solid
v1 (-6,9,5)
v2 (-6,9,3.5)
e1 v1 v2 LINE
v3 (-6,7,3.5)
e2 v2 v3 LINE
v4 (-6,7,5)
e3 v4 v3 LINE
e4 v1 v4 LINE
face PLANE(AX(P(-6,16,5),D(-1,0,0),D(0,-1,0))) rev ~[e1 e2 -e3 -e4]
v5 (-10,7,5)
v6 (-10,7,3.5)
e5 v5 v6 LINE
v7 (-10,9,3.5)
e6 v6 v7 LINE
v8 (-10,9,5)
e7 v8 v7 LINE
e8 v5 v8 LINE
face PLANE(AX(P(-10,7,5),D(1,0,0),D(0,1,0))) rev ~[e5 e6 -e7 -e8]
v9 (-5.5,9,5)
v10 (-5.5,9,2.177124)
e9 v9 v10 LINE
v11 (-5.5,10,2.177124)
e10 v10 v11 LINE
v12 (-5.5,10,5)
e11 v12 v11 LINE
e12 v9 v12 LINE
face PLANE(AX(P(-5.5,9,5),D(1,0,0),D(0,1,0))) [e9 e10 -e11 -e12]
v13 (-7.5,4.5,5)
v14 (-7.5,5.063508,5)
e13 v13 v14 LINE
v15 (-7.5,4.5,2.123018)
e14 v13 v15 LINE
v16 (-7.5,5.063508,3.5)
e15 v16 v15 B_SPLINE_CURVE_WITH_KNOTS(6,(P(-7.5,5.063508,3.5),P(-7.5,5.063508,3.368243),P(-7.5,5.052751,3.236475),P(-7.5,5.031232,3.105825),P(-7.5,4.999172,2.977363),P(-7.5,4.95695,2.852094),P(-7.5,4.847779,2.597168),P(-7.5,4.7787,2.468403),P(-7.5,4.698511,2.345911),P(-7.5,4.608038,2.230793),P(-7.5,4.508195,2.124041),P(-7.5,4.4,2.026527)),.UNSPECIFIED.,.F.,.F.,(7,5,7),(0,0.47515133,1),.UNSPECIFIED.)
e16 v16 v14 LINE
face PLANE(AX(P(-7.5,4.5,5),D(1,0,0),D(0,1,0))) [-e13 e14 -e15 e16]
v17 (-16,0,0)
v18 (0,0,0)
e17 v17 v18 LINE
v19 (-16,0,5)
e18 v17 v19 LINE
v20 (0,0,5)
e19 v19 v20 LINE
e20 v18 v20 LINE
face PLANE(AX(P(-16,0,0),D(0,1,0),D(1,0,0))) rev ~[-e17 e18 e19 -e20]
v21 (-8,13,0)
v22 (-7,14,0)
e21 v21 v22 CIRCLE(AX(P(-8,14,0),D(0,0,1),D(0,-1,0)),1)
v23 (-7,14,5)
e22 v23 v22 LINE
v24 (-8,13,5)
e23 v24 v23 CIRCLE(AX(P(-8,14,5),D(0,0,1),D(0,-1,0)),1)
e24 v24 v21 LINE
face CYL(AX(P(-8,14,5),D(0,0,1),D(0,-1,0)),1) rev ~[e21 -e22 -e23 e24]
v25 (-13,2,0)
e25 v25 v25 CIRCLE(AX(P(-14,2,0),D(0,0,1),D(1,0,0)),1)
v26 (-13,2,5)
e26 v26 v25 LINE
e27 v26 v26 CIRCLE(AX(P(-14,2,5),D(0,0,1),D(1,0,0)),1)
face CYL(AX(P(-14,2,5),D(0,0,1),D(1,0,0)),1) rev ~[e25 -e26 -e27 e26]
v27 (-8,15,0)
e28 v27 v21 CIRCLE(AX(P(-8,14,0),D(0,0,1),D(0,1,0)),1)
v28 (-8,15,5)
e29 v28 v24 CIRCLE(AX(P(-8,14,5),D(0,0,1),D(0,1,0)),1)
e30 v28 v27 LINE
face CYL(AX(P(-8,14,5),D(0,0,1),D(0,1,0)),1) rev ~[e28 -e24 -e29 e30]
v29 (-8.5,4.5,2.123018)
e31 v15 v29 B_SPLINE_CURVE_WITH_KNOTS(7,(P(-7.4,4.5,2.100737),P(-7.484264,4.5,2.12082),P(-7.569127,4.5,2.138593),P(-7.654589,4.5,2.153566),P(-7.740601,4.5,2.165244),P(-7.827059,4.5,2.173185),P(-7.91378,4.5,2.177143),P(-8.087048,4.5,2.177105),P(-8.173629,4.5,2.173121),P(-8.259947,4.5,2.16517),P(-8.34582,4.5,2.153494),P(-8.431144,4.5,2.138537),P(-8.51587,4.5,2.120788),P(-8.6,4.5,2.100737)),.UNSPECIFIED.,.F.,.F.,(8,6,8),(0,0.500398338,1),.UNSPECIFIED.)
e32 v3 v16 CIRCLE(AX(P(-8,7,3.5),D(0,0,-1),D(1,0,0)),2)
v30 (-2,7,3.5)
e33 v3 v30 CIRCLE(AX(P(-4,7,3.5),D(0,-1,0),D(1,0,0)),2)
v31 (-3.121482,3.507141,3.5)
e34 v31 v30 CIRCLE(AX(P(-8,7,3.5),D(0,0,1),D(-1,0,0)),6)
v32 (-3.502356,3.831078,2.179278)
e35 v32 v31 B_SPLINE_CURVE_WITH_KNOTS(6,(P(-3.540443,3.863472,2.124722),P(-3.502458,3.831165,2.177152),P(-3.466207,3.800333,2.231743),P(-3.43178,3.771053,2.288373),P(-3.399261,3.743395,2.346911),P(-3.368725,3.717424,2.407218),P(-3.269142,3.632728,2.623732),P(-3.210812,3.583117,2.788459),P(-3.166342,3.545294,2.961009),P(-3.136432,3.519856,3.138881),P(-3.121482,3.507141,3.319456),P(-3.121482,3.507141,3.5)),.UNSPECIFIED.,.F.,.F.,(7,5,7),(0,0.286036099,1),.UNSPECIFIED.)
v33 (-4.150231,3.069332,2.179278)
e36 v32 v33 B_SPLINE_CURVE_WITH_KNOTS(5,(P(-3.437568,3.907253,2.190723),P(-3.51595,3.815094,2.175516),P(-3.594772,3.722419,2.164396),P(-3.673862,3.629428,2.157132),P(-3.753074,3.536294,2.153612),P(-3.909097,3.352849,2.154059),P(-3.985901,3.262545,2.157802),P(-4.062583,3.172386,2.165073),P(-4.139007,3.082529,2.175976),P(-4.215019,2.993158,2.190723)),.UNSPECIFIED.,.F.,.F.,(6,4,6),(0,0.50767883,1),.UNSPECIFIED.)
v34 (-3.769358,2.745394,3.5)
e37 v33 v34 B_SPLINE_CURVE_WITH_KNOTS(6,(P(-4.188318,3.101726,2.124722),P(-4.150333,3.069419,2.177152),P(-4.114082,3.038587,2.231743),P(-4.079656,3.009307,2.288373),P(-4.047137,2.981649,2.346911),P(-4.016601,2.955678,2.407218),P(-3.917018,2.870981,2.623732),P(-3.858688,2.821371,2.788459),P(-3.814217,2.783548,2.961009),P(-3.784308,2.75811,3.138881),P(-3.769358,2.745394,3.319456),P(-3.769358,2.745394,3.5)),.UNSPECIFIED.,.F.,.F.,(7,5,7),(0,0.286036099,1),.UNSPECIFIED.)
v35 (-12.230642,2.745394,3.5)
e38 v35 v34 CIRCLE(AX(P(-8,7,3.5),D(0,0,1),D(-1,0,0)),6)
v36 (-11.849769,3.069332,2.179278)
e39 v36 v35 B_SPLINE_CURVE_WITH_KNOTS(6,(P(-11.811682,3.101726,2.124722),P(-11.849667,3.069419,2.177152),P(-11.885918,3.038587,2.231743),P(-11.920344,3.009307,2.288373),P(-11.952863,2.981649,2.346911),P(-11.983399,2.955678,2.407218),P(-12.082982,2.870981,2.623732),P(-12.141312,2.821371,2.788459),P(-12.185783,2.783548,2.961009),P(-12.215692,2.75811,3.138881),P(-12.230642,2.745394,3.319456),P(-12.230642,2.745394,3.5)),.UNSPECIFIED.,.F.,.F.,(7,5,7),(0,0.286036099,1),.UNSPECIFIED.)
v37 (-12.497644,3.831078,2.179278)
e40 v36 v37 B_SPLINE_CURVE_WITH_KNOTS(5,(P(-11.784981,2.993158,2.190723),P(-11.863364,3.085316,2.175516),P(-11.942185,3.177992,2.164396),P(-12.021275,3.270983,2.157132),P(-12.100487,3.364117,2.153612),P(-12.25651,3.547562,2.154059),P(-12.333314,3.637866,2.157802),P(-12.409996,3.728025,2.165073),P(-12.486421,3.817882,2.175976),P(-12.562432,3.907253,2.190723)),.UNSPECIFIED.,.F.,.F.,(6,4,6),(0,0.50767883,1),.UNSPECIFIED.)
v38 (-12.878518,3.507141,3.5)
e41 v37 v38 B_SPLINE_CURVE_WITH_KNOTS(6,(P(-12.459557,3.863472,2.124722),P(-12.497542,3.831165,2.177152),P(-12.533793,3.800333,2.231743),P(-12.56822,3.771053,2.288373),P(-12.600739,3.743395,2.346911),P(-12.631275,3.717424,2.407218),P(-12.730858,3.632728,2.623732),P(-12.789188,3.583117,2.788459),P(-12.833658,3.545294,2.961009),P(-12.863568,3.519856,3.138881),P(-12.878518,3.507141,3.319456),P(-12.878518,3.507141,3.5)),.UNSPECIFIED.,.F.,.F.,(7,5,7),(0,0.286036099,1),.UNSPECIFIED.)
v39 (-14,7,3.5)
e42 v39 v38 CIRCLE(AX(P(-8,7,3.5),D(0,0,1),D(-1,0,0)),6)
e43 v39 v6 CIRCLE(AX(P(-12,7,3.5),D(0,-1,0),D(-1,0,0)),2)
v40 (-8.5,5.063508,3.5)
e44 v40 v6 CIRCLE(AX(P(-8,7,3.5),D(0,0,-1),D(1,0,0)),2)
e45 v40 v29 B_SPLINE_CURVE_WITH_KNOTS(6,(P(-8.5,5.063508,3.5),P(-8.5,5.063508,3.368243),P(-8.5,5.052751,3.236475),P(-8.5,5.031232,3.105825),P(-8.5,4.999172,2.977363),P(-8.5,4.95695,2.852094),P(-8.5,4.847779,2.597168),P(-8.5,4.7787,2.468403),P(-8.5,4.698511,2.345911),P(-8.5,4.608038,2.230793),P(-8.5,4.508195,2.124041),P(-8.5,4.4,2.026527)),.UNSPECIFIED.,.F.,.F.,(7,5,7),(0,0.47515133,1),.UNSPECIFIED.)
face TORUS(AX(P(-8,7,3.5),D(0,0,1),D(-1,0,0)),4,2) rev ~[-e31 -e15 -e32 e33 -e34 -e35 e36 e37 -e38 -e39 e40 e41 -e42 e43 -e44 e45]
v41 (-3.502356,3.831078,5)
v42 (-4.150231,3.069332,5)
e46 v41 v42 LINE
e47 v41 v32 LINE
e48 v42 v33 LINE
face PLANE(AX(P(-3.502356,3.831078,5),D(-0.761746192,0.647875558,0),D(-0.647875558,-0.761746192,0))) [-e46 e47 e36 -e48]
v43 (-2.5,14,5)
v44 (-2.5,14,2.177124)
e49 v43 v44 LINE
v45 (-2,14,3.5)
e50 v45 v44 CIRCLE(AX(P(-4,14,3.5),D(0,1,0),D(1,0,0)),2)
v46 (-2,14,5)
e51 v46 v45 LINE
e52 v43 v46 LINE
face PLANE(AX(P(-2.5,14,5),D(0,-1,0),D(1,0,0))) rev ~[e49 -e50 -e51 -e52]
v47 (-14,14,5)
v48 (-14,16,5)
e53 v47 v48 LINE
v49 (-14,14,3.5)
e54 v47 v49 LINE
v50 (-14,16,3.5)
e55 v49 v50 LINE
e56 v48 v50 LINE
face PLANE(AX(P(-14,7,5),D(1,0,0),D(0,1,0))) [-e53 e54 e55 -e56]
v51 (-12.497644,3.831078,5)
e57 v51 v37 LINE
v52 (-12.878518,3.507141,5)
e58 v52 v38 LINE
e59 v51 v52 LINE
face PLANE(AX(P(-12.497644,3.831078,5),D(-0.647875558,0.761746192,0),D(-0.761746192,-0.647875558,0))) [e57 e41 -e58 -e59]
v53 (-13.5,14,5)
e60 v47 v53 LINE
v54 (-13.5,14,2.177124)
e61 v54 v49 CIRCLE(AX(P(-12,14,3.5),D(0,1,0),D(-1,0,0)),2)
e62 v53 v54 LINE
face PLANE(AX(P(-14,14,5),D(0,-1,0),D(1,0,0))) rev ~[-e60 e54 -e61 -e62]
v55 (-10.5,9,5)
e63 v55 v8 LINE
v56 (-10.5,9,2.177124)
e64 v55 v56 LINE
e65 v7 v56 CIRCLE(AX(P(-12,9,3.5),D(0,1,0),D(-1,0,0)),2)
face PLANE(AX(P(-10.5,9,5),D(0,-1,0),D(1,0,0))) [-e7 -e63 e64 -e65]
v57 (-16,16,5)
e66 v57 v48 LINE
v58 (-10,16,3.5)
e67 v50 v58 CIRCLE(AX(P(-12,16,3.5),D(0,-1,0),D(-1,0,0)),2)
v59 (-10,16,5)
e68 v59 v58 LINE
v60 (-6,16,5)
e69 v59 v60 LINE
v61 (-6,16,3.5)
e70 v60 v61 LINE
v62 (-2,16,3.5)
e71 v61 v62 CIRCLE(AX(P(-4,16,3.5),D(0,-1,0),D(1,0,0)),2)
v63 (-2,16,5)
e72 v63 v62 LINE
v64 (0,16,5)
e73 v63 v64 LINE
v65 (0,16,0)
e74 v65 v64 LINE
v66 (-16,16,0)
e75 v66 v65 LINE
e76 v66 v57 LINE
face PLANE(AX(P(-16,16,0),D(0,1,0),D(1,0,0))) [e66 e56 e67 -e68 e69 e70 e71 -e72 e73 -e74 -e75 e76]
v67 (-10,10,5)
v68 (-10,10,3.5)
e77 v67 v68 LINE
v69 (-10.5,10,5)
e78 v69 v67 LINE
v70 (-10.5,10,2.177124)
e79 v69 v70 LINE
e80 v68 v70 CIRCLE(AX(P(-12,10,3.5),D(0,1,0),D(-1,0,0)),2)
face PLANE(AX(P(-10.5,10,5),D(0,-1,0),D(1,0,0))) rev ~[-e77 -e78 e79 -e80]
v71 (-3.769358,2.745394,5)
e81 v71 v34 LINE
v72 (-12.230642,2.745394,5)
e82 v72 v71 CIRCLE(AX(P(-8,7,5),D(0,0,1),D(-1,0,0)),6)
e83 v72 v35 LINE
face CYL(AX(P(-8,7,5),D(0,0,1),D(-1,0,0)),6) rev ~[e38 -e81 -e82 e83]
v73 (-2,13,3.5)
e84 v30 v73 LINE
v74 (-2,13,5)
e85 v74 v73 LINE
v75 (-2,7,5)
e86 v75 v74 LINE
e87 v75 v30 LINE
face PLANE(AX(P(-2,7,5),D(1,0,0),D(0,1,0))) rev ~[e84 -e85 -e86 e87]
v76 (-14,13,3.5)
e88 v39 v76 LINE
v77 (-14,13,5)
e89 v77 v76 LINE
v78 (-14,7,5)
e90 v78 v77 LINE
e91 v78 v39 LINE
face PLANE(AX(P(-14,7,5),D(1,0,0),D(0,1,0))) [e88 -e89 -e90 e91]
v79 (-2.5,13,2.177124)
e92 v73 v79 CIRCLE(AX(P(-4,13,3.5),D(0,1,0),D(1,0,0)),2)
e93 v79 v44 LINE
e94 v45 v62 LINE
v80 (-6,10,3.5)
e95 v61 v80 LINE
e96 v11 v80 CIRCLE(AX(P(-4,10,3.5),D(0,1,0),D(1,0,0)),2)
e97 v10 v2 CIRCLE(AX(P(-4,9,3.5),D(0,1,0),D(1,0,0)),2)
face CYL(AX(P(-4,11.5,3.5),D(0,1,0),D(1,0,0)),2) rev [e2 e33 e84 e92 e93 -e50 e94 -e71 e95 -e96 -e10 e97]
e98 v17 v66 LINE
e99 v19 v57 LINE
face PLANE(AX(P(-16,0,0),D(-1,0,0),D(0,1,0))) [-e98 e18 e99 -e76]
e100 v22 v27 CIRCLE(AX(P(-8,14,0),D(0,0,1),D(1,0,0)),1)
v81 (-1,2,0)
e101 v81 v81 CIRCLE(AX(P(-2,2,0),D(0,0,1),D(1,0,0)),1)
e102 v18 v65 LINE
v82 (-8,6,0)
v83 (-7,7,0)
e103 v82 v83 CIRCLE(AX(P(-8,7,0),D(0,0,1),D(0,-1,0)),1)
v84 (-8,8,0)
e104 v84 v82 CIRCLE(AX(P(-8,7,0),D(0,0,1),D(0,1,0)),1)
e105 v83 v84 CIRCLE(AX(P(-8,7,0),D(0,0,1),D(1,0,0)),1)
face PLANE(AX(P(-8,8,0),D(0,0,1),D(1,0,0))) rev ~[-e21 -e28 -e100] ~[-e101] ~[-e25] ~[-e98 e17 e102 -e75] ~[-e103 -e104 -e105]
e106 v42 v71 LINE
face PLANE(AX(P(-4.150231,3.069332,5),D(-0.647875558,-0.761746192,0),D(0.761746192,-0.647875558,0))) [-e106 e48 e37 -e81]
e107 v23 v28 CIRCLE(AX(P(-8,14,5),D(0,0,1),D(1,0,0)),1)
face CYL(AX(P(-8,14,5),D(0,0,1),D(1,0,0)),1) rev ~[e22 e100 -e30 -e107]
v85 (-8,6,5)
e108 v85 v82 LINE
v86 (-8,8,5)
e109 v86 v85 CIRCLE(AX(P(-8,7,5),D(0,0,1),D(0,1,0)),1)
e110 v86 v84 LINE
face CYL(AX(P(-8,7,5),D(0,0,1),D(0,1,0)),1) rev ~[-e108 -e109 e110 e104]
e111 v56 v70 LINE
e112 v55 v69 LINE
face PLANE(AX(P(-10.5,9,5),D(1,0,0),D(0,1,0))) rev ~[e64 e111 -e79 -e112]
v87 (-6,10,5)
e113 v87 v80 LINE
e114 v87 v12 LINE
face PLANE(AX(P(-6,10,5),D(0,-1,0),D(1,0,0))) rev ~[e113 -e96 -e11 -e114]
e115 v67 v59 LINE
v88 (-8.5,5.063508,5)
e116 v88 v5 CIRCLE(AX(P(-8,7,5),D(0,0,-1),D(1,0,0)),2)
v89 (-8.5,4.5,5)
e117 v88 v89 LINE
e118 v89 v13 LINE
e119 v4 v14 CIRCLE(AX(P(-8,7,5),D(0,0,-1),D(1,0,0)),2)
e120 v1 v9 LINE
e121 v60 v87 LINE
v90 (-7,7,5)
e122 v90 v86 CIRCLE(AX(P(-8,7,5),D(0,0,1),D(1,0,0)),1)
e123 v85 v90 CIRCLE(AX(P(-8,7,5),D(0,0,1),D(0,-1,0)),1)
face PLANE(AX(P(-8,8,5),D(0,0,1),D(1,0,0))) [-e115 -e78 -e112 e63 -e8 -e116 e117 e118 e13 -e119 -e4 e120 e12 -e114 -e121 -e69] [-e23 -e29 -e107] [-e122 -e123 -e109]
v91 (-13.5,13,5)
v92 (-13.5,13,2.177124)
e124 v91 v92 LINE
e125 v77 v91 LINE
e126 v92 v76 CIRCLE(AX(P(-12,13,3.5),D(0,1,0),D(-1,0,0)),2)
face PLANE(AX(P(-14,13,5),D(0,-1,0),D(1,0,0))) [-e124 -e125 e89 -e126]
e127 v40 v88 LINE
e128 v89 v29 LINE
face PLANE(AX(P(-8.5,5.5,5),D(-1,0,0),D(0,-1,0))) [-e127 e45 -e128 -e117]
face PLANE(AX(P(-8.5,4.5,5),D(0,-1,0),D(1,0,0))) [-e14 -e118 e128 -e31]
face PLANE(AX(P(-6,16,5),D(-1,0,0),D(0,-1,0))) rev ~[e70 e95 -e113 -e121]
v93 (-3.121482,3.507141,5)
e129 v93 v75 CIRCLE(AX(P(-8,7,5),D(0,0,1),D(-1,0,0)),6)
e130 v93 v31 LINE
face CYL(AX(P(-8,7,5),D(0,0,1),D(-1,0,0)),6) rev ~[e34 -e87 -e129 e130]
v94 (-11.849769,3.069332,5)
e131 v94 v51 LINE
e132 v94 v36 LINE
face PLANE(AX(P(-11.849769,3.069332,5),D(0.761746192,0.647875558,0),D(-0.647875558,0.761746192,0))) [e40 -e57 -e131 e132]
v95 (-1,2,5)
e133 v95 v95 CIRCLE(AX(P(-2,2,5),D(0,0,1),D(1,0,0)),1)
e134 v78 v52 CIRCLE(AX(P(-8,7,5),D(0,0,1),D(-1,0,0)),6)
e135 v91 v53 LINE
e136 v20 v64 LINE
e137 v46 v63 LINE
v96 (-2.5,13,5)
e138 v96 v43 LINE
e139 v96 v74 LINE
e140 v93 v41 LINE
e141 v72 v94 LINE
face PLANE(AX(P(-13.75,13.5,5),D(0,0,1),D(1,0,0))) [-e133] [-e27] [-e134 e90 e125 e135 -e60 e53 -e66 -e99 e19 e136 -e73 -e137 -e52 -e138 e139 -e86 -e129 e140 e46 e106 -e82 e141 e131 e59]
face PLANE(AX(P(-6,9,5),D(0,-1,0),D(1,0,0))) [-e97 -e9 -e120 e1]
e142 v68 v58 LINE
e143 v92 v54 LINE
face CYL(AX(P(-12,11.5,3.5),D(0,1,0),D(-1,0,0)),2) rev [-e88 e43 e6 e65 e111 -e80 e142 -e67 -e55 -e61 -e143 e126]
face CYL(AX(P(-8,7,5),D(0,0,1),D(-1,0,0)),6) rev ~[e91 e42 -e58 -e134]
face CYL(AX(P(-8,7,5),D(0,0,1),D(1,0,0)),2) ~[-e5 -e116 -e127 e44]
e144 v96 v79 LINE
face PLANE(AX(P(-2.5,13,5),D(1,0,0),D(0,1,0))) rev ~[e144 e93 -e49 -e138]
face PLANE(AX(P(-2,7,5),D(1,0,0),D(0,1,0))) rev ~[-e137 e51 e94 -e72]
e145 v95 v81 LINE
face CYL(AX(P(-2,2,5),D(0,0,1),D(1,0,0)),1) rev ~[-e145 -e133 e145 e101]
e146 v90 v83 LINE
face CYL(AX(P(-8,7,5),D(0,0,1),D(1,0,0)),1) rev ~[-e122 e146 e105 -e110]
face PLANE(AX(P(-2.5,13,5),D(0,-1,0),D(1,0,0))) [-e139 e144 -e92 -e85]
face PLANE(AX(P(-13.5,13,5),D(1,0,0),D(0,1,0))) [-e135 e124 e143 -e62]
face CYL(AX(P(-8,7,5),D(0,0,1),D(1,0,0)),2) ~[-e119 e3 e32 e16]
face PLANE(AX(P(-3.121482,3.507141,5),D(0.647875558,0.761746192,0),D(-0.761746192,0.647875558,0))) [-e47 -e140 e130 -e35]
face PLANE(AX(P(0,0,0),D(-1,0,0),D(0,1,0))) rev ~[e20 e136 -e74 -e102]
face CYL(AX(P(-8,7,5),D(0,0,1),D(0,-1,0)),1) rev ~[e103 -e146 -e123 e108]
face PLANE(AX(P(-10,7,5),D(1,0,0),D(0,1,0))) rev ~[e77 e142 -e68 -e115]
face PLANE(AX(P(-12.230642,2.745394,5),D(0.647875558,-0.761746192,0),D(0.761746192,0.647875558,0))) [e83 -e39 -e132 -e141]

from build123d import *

# Parameters (mm, degrees)
F0_W      = 16
F0_H      = 16
F1_DEPTH  = 5
F2_W      = 2
F2_H      = 9
F3_DEPTH  = 1.5
F4_W      = 2
F4_H      = 9
F8_W      = 0.5
F8_H      = 1
F8_H_2    = 0.5
F9_DEPTH  = 5
F10_R     = 1
F11_DEPTH = 25


# Not quite as in the source:
# - a feature names something its author has since deleted; it is built from what else it names


with BuildPart() as f1:
    # F0 (on Top) → F1 (new body)
    with BuildSketch(Plane.XY):
        with Locations((-8, 8)):
            Rectangle(F0_W, F0_H)
    extrude(amount=F1_DEPTH)

    # F2 (on face) → F3 (cut)
    with BuildSketch(Plane.XY.offset(5)):
        with Locations((-13, 11.5)):
            Rectangle(F2_W, F2_H)
        with BuildLine():
            Line((-12, 7), (-14, 7))
            ThreePointArc((-14, 7), (-8, 1), (-2, 7))
            Line((-2, 7), (-4, 7))
            ThreePointArc((-4, 7), (-8, 3), (-12, 7))
        make_face()
        with BuildLine():
            Line((-10, 16), (-12, 16))
            Line((-12, 16), (-12, 7))
            ThreePointArc((-12, 7), (-8, 3), (-4, 7))
            Line((-4, 7), (-4, 16))
            Line((-4, 16), (-6, 16))
            Line((-6, 16), (-6, 7))
            ThreePointArc((-6, 7), (-8, 5), (-10, 7))
            Line((-10, 7), (-10, 16))
        make_face()
        with Locations((-3, 11.5)):
            Rectangle(F2_W, F2_H)
    extrude(amount=-F3_DEPTH, mode=Mode.SUBTRACT)

    # F4 (on face) → F5 (revolve, cut)
    with BuildSketch(Plane.XY.offset(3.5)):
        with Locations((-13, 11.5)):
            Rectangle(F4_W, F4_H)
    revolve(axis=Axis((-12, 11.5, 3.5), (0, -1, 0)), mode=Mode.SUBTRACT)

    # F6: sweep along a path in F6_path
    with BuildLine(Plane(origin=(-10, 7, 3.5), x_dir=(0, -1, 0), z_dir=(0, 0, -1))) as f6_path:
        ThreePointArc((0, 0), (2, -2), (0, -4))
    # F5_face (on face) → F6 (sweep, cut)
    with BuildSketch(Plane(origin=(-12, 7, 2.6511736368), x_dir=(-1, 0, 0), z_dir=(0, 1, 0))):
        with BuildLine():
            Line((2, 0.8488263632), (-2, 0.8488263632))
            ThreePointArc((-2, 0.8488263632), (0, -1.1511736368), (2, 0.8488263632))
        make_face()
    sweep(path=f6_path.line, mode=Mode.SUBTRACT)

    # F4 (on face) → F7 (revolve, cut)
    with BuildSketch(Plane.XY.offset(3.5)):
        with Locations((-3, 11.5)):
            Rectangle(F4_W, F4_H)
    revolve(axis=Axis((-4, 11.5, 3.5), (0, -1, 0)), mode=Mode.SUBTRACT)

    # F8 (on face) → F9 (join)
    with BuildSketch(Plane.XY.offset(5)):
        with Locations((-13.75, 13.5)):
            Rectangle(F8_W, F8_H)
        with Locations((-10.25, 9.5)):
            Rectangle(F8_W, F8_H)
        with Locations((-5.75, 9.5)):
            Rectangle(F8_W, F8_H)
        with Locations((-2.25, 13.5)):
            Rectangle(F8_W, F8_H)
        with BuildLine():
            Line((-12.4976444751, 3.8310784478), (-12.8785175711, 3.5071406687))
            ThreePointArc((-12.8785175711, 3.5071406687), (-12.570477152, 3.1127466505), (-12.2306420128, 2.7453944767))
            Line((-12.2306420128, 2.7453944767), (-11.8497689168, 3.0693322558))
            Line((-11.8497689168, 3.0693322558), (-12.4976444751, 3.8310784478))
        make_face()
        with BuildLine():
            ThreePointArc((-3.7693579872, 2.7453944767), (-3.429522848, 3.1127466505), (-3.1214824289, 3.5071406687))
            Line((-3.1214824289, 3.5071406687), (-3.5023555249, 3.8310784478))
            Line((-3.5023555249, 3.8310784478), (-4.1502310832, 3.0693322558))
            Line((-4.1502310832, 3.0693322558), (-3.7693579872, 2.7453944767))
        make_face()
        with Locations((-8.25, 4.75)):
            Rectangle(F8_W, F8_H_2)
        with Locations((-7.75, 4.75)):
            Rectangle(F8_W, F8_H_2)
        with Locations((-8.25, 5.25)):
            Rectangle(F8_W, F8_H_2)
        with Locations((-7.75, 5.25)):
            Rectangle(F8_W, F8_H_2)
    extrude(amount=-F9_DEPTH)

    # F10 (on face) → F11 (cut)
    with BuildSketch(Plane.XY.offset(5)):
        with BuildLine():
            ThreePointArc((-7, 14), (-7.2928932188, 14.7071067812), (-8, 15))
            Line((-8, 15), (-8, 13))
            ThreePointArc((-8, 13), (-7.2928932188, 13.2928932188), (-7, 14))
        make_face()
        with BuildLine():
            Line((-8, 13), (-8, 15))
            ThreePointArc((-8, 15), (-9, 14), (-8, 13))
        make_face()
        with BuildLine():
            Line((-8, 8), (-8, 6))
            ThreePointArc((-8, 6), (-7.2928932188, 6.2928932188), (-7, 7))
            ThreePointArc((-7, 7), (-7.2928932188, 7.7071067812), (-8, 8))
        make_face()
        with BuildLine():
            ThreePointArc((-8, 8), (-9, 7), (-8, 6))
            Line((-8, 6), (-8, 8))
        make_face()
        with Locations((-14, 2)):
            Circle(F10_R)
        with Locations((-2, 2)):
            Circle(F10_R)
    extrude(amount=-F11_DEPTH, mode=Mode.SUBTRACT)


solid = f1.part
